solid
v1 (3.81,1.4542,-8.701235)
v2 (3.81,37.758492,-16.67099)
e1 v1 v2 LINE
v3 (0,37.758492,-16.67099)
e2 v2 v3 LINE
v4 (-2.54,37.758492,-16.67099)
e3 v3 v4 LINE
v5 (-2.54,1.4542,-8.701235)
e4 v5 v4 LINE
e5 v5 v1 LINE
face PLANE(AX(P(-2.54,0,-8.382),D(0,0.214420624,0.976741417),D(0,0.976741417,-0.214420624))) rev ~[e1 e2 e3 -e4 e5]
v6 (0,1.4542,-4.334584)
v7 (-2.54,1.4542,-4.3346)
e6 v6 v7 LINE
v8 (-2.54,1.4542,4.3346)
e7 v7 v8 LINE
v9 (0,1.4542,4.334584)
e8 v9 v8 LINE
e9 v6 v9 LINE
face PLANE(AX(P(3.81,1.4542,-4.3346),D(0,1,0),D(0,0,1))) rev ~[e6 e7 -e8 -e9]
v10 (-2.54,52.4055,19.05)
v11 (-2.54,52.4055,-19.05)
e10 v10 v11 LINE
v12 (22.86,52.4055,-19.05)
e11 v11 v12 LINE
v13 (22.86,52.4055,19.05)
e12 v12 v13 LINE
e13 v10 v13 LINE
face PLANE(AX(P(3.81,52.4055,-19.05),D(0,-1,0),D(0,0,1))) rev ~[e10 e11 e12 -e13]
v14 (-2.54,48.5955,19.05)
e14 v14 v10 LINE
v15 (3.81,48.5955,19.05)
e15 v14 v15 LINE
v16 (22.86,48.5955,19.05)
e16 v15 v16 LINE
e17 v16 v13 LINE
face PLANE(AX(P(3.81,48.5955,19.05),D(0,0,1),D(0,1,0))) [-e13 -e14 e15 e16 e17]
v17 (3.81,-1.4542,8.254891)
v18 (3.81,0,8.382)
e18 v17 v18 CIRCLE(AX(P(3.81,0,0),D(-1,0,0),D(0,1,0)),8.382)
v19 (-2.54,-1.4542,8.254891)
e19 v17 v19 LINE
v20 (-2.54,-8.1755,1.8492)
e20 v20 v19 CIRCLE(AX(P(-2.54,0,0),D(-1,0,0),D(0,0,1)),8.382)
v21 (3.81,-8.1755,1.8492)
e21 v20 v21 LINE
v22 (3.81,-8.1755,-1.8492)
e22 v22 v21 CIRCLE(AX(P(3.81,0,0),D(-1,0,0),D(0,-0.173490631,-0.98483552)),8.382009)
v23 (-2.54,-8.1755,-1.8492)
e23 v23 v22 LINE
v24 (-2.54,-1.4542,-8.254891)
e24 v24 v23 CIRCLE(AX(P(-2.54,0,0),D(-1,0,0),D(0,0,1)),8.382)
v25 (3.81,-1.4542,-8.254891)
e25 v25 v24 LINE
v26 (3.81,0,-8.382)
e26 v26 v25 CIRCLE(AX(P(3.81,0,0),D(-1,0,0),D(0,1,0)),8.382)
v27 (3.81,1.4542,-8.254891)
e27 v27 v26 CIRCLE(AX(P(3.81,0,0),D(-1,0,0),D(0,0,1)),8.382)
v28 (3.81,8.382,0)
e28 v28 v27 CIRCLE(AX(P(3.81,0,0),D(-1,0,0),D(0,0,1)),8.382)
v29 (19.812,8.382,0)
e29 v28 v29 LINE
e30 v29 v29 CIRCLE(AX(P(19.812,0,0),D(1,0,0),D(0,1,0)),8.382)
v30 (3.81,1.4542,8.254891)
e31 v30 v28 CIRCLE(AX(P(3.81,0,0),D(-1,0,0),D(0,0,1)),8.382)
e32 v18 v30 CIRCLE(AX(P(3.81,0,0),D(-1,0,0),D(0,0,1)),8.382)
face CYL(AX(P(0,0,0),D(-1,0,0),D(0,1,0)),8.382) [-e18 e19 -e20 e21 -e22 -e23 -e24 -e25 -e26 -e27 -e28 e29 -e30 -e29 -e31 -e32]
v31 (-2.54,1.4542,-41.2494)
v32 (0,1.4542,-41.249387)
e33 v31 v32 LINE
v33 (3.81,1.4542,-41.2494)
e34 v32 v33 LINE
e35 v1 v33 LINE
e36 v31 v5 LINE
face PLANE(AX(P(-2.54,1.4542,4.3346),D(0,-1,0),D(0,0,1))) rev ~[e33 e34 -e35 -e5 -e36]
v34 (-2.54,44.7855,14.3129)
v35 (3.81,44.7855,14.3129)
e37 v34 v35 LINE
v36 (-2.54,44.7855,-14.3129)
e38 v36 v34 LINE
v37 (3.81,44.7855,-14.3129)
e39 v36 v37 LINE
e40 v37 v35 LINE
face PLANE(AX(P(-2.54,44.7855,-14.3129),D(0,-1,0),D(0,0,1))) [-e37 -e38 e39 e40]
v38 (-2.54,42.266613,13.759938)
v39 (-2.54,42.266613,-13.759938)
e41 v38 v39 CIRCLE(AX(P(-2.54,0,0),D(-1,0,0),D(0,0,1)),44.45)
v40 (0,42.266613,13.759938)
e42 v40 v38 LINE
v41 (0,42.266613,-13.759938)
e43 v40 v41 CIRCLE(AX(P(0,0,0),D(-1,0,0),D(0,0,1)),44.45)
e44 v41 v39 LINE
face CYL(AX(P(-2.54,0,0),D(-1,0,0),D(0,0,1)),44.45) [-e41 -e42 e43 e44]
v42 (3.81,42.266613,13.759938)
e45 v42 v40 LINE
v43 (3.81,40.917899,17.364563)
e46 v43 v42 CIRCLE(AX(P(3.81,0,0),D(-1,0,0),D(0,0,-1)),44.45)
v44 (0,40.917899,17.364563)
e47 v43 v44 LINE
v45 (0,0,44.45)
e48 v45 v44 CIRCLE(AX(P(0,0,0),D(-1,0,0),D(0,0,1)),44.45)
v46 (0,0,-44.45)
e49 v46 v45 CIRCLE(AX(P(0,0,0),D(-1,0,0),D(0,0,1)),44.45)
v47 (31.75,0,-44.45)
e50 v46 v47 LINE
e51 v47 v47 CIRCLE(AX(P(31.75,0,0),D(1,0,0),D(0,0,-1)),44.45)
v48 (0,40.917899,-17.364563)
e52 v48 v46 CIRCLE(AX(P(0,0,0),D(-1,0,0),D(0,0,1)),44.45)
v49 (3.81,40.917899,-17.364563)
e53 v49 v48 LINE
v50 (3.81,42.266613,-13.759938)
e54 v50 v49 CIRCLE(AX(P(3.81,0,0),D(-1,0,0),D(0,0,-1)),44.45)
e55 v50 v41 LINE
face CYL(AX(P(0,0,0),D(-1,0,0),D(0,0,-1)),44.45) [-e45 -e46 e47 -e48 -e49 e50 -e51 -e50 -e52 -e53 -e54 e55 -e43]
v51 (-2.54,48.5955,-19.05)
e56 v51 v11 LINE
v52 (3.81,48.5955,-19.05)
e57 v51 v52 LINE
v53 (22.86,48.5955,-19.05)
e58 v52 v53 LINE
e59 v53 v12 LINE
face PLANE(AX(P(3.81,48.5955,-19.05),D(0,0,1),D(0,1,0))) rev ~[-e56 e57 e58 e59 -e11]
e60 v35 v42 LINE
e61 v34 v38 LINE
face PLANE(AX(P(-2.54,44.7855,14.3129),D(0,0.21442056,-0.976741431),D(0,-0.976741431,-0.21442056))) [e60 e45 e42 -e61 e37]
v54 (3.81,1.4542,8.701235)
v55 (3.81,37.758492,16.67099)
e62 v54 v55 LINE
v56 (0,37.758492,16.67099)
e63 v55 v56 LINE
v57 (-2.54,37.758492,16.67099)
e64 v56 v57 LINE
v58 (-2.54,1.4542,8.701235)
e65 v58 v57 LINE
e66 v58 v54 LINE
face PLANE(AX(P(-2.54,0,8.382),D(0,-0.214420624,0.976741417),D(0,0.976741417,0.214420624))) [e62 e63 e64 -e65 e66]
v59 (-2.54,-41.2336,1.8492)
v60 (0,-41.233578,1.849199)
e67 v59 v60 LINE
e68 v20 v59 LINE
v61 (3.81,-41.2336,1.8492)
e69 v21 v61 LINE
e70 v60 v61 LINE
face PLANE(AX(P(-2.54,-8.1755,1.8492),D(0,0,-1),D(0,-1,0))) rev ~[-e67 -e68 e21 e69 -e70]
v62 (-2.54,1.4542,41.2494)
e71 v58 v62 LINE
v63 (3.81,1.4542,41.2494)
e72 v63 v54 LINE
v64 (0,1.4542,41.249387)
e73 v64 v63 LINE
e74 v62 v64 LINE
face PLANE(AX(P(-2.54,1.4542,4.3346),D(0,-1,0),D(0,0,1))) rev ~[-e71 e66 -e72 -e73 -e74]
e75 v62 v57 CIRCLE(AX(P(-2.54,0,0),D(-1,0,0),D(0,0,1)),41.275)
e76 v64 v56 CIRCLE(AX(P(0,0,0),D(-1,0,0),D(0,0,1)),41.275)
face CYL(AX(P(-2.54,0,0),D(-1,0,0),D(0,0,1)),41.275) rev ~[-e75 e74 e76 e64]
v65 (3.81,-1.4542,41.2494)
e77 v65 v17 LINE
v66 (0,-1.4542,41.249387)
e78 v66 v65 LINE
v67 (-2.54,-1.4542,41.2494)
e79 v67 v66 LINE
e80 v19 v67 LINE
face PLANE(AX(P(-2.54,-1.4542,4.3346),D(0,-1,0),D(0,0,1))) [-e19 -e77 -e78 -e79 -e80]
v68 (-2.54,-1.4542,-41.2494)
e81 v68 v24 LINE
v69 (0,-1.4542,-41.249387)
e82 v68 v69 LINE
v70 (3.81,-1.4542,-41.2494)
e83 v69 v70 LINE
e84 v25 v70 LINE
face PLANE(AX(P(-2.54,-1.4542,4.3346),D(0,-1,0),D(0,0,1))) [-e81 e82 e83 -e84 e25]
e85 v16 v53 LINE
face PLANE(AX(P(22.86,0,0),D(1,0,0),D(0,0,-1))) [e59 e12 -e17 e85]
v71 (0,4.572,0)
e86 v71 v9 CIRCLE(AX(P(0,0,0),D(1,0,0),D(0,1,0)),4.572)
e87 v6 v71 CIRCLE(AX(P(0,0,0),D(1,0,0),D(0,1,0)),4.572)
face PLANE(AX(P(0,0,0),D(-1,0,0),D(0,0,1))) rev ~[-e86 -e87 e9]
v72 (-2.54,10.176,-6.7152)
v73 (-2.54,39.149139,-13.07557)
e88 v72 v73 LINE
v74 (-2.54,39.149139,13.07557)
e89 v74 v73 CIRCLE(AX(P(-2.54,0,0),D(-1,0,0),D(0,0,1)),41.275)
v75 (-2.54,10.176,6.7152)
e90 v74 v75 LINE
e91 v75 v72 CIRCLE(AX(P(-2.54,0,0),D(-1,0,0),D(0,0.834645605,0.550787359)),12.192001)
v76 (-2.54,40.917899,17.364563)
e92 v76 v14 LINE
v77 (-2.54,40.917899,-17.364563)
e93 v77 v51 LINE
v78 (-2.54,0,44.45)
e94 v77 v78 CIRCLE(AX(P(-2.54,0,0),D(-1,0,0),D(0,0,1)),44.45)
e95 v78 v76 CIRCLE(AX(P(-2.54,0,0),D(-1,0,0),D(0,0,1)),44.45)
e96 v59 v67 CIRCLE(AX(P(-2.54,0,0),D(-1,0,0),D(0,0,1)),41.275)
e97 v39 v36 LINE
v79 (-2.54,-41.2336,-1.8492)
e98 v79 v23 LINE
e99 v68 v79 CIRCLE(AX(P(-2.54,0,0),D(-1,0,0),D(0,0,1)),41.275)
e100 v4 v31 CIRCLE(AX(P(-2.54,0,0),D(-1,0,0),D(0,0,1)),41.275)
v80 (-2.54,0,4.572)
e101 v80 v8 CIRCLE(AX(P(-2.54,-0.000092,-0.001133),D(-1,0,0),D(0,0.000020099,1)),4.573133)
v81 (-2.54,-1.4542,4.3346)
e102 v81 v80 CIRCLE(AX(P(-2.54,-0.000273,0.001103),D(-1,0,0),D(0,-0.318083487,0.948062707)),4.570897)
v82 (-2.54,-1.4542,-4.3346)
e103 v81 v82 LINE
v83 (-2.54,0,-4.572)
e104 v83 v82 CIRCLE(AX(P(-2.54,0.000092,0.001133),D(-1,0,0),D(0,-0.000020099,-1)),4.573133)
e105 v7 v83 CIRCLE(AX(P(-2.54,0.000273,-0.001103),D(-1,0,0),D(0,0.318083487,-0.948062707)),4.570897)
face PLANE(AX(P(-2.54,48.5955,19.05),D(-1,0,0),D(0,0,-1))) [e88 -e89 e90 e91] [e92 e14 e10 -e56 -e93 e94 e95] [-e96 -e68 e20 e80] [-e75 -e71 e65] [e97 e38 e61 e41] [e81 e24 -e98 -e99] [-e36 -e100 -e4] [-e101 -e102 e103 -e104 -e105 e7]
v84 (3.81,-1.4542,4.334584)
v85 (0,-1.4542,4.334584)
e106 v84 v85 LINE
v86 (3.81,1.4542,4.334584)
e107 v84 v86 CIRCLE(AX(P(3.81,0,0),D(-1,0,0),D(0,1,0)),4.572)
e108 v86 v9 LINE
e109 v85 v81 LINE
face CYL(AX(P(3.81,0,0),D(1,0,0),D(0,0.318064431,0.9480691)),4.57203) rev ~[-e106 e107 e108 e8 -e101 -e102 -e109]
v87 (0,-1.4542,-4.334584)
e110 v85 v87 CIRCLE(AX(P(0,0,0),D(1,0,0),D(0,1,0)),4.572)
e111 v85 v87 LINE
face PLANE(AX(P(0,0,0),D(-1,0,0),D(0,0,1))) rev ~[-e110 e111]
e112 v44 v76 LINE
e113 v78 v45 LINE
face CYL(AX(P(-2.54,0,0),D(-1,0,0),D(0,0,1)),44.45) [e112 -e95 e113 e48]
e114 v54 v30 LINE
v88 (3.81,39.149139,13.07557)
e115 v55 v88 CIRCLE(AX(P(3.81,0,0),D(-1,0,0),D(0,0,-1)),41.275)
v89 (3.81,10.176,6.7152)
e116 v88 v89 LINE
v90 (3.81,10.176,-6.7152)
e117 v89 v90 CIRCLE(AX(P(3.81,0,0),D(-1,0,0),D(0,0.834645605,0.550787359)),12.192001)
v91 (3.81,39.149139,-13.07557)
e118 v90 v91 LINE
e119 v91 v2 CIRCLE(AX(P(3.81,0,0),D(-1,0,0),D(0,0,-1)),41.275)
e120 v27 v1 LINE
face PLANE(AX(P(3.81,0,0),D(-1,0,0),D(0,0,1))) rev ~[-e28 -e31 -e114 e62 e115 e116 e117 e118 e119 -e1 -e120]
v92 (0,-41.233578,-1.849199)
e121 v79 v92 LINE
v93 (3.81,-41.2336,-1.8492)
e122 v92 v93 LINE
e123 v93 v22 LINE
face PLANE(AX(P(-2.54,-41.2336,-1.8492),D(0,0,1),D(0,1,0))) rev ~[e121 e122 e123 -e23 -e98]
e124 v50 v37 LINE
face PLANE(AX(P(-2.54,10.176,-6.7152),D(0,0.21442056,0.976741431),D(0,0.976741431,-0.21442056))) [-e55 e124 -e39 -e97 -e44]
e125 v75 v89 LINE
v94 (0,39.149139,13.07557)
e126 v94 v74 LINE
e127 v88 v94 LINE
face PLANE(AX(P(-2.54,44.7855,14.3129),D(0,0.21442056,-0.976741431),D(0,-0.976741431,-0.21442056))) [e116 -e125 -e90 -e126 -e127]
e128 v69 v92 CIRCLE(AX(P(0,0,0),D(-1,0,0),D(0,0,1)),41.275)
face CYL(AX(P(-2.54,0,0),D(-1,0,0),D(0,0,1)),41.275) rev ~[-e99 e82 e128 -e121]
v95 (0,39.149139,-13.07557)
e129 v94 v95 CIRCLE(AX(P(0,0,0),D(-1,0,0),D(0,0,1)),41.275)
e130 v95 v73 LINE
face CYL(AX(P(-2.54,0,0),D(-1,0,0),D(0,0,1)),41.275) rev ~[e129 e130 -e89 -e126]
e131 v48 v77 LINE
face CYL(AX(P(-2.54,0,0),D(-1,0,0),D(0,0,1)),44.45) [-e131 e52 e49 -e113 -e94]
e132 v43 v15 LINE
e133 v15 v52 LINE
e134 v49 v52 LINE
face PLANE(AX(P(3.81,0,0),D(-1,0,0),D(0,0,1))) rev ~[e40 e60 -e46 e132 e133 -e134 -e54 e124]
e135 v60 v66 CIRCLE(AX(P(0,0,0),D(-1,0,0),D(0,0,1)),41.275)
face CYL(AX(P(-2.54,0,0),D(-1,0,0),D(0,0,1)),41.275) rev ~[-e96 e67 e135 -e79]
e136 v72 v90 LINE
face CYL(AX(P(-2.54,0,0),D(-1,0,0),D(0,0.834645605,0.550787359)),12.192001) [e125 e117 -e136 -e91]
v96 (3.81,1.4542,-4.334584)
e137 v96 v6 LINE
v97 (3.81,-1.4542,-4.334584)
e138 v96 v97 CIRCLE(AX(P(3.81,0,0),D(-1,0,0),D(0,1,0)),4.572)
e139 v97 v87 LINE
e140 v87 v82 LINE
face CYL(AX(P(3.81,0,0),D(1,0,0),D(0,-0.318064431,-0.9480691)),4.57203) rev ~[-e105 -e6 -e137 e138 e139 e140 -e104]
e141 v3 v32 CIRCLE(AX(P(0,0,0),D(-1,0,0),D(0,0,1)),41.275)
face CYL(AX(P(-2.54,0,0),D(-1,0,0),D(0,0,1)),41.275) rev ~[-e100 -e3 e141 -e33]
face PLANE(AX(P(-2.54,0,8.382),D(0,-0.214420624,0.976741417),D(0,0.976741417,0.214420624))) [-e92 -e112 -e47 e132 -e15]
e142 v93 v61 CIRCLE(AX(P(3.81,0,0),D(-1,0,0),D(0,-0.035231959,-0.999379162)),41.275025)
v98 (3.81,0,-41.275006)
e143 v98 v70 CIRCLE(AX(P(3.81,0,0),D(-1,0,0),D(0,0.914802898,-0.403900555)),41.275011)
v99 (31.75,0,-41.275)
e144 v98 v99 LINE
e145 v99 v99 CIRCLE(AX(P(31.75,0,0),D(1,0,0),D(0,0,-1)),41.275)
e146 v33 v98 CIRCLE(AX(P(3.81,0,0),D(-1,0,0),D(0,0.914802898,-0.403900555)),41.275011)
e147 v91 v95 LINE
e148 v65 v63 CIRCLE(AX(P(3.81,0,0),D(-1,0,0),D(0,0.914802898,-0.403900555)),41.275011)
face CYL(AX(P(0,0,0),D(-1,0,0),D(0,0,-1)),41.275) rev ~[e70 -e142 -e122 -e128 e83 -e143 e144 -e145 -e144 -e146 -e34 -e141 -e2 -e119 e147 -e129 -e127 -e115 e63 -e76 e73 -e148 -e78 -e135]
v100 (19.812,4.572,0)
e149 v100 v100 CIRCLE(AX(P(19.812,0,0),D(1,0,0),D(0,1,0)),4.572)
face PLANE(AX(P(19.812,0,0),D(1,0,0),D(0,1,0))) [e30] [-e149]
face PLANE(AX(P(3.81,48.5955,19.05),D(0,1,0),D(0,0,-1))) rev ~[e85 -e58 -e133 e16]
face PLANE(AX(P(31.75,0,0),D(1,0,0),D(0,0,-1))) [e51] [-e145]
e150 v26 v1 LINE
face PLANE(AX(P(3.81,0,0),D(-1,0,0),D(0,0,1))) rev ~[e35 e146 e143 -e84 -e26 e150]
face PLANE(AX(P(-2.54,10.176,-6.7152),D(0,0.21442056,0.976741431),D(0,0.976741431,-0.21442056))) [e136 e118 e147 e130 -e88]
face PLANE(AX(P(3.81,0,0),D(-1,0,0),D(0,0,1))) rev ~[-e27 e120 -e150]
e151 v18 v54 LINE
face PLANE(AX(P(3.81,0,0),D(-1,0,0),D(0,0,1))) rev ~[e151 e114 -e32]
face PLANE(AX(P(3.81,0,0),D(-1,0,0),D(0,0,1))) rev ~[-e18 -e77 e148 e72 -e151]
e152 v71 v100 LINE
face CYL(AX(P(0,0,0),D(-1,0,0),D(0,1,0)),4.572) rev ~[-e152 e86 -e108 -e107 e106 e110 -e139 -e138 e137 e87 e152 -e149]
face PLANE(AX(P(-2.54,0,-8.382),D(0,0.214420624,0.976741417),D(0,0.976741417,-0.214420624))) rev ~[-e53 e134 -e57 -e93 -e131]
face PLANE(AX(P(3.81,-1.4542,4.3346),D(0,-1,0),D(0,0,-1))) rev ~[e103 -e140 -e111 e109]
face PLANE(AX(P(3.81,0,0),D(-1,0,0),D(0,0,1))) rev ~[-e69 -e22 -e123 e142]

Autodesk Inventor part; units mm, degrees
ref_plane "YZ Plane" through (0, 0, 0) normal (1, 0, 0) x (0, 1, 0)
ref_plane "XZ Plane" through (0, 0, 0) normal (0, 1, 0) x (-1, 0, 0)
ref_plane "XY Plane" through (0, 0, 0) normal (0, 0, 1) x (1, 0, 0)
sketch "Sketch1" plane through (0, 0, 0) normal (1, 0, 0) x (0, 1, 0)
  circle A0 centre (0, 0) radius 4.572
  circle A1 centre (0, 0) radius 8.382
  dimension "d0" = 9.144
  dimension "d1" = 3.81
extrude "Extrusion1" add sketch "Sketch1" along normal blind 19.812
sketch "Sketch2" plane through (0, 0, 0) normal (-1, 0, 0) x (0, 0, 1)
  circle A0 centre (0, 0) radius 8.382
  circle A1 centre (0, 0) radius 7.747
  circle A2 centre (0, 0) radius 8.382 projected
  dimension "d42" = 0
extrude "Extrusion2" add sketch "Sketch2" along normal blind 2.54 contours A0 | A1
sketch "Sketch3" plane through (-2.54, 0, 0) normal (-1, 0, 0) x (0, 0, 1)
  line L0 (19.05, 48.5955) -> (-19.05, 48.5955)
  circle A0 centre (0, 0) radius 8.382 projected
  line L1 (8.382, 0) -> (19.05, 48.5955)
  line L2 (-8.382, 0) -> (-19.05, 48.5955)
  arc A1 (8.382, 0) -> (-8.382, 0) centre (0, 0) ccw
  line L3 (-14.3129, 44.7855) -> (14.3129, 44.7855)
  line L4 (14.3129, 44.7855) -> (6.7152, 10.176)
  arc A2 (6.7152, 10.176) -> (-6.7152, 10.176) centre (0, 0) ccw
  line L5 (-6.7152, 10.176) -> (-14.3129, 44.7855)
  dimension "d6" = 38.1
  dimension "d7" = 19.05
  dimension "d8" = 3.81
extrude "Extrusion3" add sketch "Sketch3" against normal blind 6.35 contours L1 A0 L2 L0
sketch "Sketch6" plane through (-2.54, 44.7855, -14.3129) normal (0, -1, 0) x (1, 0, 0)
  line L0 (6.35, 32.4159) -> (26.9875, 32.4159) projected
  line L1 (13.4874, 32.4159) -> (13.4874, 26.0989)
  line L2 (26.9875, 32.4159) -> (26.9875, -3.9117) projected
  point P0 (2.54, 14.3129)
  dimension "d20" = 13.5001
sketch "Sketch10" plane through (0, 0, 0) normal (1, 0, 0) x (0, 0, -1)
  circle A0 centre (0, 0) radius 1.4542
  line L0 (-4.572, 1.4542) -> (4.572, 1.4542)
  line L1 (4.572, 1.4542) -> (4.572, -1.4542)
  line L2 (4.572, -1.4542) -> (-4.572, -1.4542)
  line L3 (-4.572, -1.4542) -> (-4.572, 1.4542)
  circle A1 centre (0, 0) radius 4.572 projected
  dimension "d43" = 0
  dimension "d44" = 0
extrude "Extrusion7" cut sketch "Sketch10" against normal blind 22.225 contours A0 | A0 L0 A1 L2 | A0 L2 A1 L0 | A1 L3 L0 | L0 L1 A1 | A1 L1 L2 | L2 L3 A1
sketch "Sketch13" plane through (-2.54, 48.5955, 19.05) normal (0, 1, 0) x (1, 0, 0)
  line L0 (4.6355, 36.83) -> (1.7145, 36.83)
  line L1 (1.7145, 36.83) -> (1.7145, 33.909)
  line L2 (1.7145, 33.909) -> (4.6355, 33.909)
  line L3 (4.6355, 33.909) -> (4.6355, 36.83)
  line L4 (6.35, 38.1) -> (6.35, 0) projected
  line L5 (0, 38.1) -> (6.35, 38.1) projected
  line L6 (4.6228, 4.191) -> (1.7018, 4.191)
  line L7 (1.7018, 4.191) -> (1.7018, 1.27)
  line L8 (1.7018, 1.27) -> (4.6228, 1.27)
  line L9 (4.6228, 1.27) -> (4.6228, 4.191)
  line L10 (0, 0) -> (6.35, 0) projected
  line L11 (0, 0) -> (0, 38.1) projected
  line L12 (0, 0) -> (6.35, 0) projected
  line L13 (6.35, 38.1) -> (6.35, 0) projected
  line L14 (0, 38.1) -> (6.35, 38.1) projected
  point P0 (2.54, 19.05)
  dimension "d32" = 2.921
  dimension "d33" = 2.921
  dimension "d34" = 1.7145
  dimension "d35" = 1.27
  dimension "d36" = 2.921
  dimension "d37" = 2.921
  dimension "d38" = 1.7272
  dimension "d39" = 1.27
extrude "Extrusion9" add sketch "Sketch13" along normal blind 3.81 contours L3 L2 L1 L0 | L4 L10 L11 L5 | L9 L8 L7 L6
sketch "Sketch14" plane through (0, 0, 0) normal (-1, 0, 0) x (0, 0, 1)
  arc A0 (4.3346, -1.4542) -> (4.572, 0) centre (0, 0) ccw projected
  line L0 (4.3346, -1.4542) -> (4.572, -1.4542) projected
  line L1 (4.572, -1.4542) -> (4.572, 0) projected
  arc A1 (4.572, 0) -> (4.3346, 1.4542) centre (0, 0) ccw projected
  line L2 (4.572, 0) -> (4.572, 1.4542) projected
  line L3 (4.572, 1.4542) -> (4.3346, 1.4542) projected
  arc A2 (-4.572, 0) -> (-4.3346, -1.4542) centre (0, 0) ccw projected
  line L4 (-4.572, 0) -> (-4.572, -1.4542) projected
  line L5 (-4.572, -1.4542) -> (-4.3346, -1.4542) projected
  arc A3 (-4.3346, 1.4542) -> (-4.572, 0) centre (0, 0) ccw projected
  line L6 (-4.3346, 1.4542) -> (-4.572, 1.4542) projected
  line L7 (-4.572, 1.4542) -> (-4.572, 0) projected
extrude "Extrusion10" add sketch "Sketch14" along normal blind 2.54
sketch "Sketch15" plane through (-2.54, 0, 0) normal (-1, 0, 0) x (0, 0, 1)
  circle A0 centre (0, 0) radius 41.275
  circle A1 centre (0, 0) radius 44.45
  dimension "d47" = 82.55
  dimension "d48" = 88.9
extrude "Extrusion11" add sketch "Sketch15" against normal blind 2.54
sketch "Sketch16" plane through (0, 0, 0) normal (1, 0, 0) x (0, 0, -1)
  circle A0 centre (0, 0) radius 44.45
  circle A1 centre (0, 0) radius 41.275
  dimension "d51" = 82.55
extrude "Extrusion12" add sketch "Sketch16" along normal blind 31.75
sketch "Sketch19" plane through (-2.54, 0, 0) normal (-1, 0, 0) x (0, 0, 1)
  line L0 (4.3346, 1.4542) -> (-4.3346, 1.4542) projected
  arc A0 (-16.671, 37.7585) -> (16.671, 37.7585) centre (0, 0) ccw projected
  line L1 (-4.3346, 1.4542) -> (-41.2494, 1.4542)
  line L2 (4.3346, 1.4542) -> (41.2494, 1.4542)
  circle A1 centre (0, 0) radius 8.382
  line L3 (-4.3346, -1.4542) -> (4.3346, -1.4542)
  line L4 (4.3346, 1.4542) -> (-4.3346, 1.4542)
  line L5 (-41.2494, -1.4542) -> (41.2494, -1.4542)
extrude "Extrusion14" add sketch "Sketch19" against normal blind 6.35 contours L2 A1 L5 L3 L1 L0 | L2 A0 L5 A1 | A1 L5 A0 L1
sketch "Sketch20" plane through (3.81, 0, 0) normal (1, 0, 0) x (0, 0, -1)
  arc A0 (4.3346, -1.4542) -> (4.3346, 1.4542) centre (0, 0) ccw projected
  line L0 (4.3346, 1.4542) -> (-4.3346, 1.4542) projected
  arc A1 (-4.3346, 1.4542) -> (-4.3346, -1.4542) centre (0, 0) ccw projected
  line L1 (-4.3346, -1.4542) -> (4.3346, -1.4542) projected
extrude "Extrusion15" cut sketch "Sketch20" against normal blind 6.35
sketch "Sketch21" plane through (-2.54, 0, 0) normal (-1, 0, 0) x (0, 0, 1)
  arc A0 (-8.2549, -1.4542) -> (8.2549, -1.4542) centre (0, 0) ccw projected
  line L0 (1.8492, -8.1755) -> (1.8492, -41.2336)
  arc A1 (-41.2494, -1.4542) -> (41.2494, -1.4542) centre (0, 0) ccw projected
  line L1 (-1.8492, -41.2336) -> (-1.8492, -8.1755)
  arc A2 (-1.8492, -8.1755) -> (1.8492, -8.1755) centre (0, 0) ccw
  arc A3 (-1.8492, -41.2336) -> (1.8492, -41.2336) centre (0, 0) ccw
extrude "Extrusion16" add sketch "Sketch21" against normal blind 6.35
sketch "Sketch23" plane through (3.81, 0, 0) normal (1, 0, 0) x (0, 0, -1)
  line L0 (19.05, 52.4055) -> (-19.05, 52.4055) projected
  line L1 (-19.05, 48.5955) -> (-19.05, 52.4055) projected
  line L2 (19.05, 52.4055) -> (-19.05, 52.4055)
  line L3 (-19.05, 52.4055) -> (-19.05, 48.5955)
  line L4 (-19.05, 48.5955) -> (19.05, 48.5955)
  line L5 (19.05, 48.5955) -> (19.05, 52.4055)
  point P0 (0, 0)
extrude "Extrusion17" add sketch "Sketch23" along normal blind 19.05
properties part number "BasicThrustMotorHousing"
